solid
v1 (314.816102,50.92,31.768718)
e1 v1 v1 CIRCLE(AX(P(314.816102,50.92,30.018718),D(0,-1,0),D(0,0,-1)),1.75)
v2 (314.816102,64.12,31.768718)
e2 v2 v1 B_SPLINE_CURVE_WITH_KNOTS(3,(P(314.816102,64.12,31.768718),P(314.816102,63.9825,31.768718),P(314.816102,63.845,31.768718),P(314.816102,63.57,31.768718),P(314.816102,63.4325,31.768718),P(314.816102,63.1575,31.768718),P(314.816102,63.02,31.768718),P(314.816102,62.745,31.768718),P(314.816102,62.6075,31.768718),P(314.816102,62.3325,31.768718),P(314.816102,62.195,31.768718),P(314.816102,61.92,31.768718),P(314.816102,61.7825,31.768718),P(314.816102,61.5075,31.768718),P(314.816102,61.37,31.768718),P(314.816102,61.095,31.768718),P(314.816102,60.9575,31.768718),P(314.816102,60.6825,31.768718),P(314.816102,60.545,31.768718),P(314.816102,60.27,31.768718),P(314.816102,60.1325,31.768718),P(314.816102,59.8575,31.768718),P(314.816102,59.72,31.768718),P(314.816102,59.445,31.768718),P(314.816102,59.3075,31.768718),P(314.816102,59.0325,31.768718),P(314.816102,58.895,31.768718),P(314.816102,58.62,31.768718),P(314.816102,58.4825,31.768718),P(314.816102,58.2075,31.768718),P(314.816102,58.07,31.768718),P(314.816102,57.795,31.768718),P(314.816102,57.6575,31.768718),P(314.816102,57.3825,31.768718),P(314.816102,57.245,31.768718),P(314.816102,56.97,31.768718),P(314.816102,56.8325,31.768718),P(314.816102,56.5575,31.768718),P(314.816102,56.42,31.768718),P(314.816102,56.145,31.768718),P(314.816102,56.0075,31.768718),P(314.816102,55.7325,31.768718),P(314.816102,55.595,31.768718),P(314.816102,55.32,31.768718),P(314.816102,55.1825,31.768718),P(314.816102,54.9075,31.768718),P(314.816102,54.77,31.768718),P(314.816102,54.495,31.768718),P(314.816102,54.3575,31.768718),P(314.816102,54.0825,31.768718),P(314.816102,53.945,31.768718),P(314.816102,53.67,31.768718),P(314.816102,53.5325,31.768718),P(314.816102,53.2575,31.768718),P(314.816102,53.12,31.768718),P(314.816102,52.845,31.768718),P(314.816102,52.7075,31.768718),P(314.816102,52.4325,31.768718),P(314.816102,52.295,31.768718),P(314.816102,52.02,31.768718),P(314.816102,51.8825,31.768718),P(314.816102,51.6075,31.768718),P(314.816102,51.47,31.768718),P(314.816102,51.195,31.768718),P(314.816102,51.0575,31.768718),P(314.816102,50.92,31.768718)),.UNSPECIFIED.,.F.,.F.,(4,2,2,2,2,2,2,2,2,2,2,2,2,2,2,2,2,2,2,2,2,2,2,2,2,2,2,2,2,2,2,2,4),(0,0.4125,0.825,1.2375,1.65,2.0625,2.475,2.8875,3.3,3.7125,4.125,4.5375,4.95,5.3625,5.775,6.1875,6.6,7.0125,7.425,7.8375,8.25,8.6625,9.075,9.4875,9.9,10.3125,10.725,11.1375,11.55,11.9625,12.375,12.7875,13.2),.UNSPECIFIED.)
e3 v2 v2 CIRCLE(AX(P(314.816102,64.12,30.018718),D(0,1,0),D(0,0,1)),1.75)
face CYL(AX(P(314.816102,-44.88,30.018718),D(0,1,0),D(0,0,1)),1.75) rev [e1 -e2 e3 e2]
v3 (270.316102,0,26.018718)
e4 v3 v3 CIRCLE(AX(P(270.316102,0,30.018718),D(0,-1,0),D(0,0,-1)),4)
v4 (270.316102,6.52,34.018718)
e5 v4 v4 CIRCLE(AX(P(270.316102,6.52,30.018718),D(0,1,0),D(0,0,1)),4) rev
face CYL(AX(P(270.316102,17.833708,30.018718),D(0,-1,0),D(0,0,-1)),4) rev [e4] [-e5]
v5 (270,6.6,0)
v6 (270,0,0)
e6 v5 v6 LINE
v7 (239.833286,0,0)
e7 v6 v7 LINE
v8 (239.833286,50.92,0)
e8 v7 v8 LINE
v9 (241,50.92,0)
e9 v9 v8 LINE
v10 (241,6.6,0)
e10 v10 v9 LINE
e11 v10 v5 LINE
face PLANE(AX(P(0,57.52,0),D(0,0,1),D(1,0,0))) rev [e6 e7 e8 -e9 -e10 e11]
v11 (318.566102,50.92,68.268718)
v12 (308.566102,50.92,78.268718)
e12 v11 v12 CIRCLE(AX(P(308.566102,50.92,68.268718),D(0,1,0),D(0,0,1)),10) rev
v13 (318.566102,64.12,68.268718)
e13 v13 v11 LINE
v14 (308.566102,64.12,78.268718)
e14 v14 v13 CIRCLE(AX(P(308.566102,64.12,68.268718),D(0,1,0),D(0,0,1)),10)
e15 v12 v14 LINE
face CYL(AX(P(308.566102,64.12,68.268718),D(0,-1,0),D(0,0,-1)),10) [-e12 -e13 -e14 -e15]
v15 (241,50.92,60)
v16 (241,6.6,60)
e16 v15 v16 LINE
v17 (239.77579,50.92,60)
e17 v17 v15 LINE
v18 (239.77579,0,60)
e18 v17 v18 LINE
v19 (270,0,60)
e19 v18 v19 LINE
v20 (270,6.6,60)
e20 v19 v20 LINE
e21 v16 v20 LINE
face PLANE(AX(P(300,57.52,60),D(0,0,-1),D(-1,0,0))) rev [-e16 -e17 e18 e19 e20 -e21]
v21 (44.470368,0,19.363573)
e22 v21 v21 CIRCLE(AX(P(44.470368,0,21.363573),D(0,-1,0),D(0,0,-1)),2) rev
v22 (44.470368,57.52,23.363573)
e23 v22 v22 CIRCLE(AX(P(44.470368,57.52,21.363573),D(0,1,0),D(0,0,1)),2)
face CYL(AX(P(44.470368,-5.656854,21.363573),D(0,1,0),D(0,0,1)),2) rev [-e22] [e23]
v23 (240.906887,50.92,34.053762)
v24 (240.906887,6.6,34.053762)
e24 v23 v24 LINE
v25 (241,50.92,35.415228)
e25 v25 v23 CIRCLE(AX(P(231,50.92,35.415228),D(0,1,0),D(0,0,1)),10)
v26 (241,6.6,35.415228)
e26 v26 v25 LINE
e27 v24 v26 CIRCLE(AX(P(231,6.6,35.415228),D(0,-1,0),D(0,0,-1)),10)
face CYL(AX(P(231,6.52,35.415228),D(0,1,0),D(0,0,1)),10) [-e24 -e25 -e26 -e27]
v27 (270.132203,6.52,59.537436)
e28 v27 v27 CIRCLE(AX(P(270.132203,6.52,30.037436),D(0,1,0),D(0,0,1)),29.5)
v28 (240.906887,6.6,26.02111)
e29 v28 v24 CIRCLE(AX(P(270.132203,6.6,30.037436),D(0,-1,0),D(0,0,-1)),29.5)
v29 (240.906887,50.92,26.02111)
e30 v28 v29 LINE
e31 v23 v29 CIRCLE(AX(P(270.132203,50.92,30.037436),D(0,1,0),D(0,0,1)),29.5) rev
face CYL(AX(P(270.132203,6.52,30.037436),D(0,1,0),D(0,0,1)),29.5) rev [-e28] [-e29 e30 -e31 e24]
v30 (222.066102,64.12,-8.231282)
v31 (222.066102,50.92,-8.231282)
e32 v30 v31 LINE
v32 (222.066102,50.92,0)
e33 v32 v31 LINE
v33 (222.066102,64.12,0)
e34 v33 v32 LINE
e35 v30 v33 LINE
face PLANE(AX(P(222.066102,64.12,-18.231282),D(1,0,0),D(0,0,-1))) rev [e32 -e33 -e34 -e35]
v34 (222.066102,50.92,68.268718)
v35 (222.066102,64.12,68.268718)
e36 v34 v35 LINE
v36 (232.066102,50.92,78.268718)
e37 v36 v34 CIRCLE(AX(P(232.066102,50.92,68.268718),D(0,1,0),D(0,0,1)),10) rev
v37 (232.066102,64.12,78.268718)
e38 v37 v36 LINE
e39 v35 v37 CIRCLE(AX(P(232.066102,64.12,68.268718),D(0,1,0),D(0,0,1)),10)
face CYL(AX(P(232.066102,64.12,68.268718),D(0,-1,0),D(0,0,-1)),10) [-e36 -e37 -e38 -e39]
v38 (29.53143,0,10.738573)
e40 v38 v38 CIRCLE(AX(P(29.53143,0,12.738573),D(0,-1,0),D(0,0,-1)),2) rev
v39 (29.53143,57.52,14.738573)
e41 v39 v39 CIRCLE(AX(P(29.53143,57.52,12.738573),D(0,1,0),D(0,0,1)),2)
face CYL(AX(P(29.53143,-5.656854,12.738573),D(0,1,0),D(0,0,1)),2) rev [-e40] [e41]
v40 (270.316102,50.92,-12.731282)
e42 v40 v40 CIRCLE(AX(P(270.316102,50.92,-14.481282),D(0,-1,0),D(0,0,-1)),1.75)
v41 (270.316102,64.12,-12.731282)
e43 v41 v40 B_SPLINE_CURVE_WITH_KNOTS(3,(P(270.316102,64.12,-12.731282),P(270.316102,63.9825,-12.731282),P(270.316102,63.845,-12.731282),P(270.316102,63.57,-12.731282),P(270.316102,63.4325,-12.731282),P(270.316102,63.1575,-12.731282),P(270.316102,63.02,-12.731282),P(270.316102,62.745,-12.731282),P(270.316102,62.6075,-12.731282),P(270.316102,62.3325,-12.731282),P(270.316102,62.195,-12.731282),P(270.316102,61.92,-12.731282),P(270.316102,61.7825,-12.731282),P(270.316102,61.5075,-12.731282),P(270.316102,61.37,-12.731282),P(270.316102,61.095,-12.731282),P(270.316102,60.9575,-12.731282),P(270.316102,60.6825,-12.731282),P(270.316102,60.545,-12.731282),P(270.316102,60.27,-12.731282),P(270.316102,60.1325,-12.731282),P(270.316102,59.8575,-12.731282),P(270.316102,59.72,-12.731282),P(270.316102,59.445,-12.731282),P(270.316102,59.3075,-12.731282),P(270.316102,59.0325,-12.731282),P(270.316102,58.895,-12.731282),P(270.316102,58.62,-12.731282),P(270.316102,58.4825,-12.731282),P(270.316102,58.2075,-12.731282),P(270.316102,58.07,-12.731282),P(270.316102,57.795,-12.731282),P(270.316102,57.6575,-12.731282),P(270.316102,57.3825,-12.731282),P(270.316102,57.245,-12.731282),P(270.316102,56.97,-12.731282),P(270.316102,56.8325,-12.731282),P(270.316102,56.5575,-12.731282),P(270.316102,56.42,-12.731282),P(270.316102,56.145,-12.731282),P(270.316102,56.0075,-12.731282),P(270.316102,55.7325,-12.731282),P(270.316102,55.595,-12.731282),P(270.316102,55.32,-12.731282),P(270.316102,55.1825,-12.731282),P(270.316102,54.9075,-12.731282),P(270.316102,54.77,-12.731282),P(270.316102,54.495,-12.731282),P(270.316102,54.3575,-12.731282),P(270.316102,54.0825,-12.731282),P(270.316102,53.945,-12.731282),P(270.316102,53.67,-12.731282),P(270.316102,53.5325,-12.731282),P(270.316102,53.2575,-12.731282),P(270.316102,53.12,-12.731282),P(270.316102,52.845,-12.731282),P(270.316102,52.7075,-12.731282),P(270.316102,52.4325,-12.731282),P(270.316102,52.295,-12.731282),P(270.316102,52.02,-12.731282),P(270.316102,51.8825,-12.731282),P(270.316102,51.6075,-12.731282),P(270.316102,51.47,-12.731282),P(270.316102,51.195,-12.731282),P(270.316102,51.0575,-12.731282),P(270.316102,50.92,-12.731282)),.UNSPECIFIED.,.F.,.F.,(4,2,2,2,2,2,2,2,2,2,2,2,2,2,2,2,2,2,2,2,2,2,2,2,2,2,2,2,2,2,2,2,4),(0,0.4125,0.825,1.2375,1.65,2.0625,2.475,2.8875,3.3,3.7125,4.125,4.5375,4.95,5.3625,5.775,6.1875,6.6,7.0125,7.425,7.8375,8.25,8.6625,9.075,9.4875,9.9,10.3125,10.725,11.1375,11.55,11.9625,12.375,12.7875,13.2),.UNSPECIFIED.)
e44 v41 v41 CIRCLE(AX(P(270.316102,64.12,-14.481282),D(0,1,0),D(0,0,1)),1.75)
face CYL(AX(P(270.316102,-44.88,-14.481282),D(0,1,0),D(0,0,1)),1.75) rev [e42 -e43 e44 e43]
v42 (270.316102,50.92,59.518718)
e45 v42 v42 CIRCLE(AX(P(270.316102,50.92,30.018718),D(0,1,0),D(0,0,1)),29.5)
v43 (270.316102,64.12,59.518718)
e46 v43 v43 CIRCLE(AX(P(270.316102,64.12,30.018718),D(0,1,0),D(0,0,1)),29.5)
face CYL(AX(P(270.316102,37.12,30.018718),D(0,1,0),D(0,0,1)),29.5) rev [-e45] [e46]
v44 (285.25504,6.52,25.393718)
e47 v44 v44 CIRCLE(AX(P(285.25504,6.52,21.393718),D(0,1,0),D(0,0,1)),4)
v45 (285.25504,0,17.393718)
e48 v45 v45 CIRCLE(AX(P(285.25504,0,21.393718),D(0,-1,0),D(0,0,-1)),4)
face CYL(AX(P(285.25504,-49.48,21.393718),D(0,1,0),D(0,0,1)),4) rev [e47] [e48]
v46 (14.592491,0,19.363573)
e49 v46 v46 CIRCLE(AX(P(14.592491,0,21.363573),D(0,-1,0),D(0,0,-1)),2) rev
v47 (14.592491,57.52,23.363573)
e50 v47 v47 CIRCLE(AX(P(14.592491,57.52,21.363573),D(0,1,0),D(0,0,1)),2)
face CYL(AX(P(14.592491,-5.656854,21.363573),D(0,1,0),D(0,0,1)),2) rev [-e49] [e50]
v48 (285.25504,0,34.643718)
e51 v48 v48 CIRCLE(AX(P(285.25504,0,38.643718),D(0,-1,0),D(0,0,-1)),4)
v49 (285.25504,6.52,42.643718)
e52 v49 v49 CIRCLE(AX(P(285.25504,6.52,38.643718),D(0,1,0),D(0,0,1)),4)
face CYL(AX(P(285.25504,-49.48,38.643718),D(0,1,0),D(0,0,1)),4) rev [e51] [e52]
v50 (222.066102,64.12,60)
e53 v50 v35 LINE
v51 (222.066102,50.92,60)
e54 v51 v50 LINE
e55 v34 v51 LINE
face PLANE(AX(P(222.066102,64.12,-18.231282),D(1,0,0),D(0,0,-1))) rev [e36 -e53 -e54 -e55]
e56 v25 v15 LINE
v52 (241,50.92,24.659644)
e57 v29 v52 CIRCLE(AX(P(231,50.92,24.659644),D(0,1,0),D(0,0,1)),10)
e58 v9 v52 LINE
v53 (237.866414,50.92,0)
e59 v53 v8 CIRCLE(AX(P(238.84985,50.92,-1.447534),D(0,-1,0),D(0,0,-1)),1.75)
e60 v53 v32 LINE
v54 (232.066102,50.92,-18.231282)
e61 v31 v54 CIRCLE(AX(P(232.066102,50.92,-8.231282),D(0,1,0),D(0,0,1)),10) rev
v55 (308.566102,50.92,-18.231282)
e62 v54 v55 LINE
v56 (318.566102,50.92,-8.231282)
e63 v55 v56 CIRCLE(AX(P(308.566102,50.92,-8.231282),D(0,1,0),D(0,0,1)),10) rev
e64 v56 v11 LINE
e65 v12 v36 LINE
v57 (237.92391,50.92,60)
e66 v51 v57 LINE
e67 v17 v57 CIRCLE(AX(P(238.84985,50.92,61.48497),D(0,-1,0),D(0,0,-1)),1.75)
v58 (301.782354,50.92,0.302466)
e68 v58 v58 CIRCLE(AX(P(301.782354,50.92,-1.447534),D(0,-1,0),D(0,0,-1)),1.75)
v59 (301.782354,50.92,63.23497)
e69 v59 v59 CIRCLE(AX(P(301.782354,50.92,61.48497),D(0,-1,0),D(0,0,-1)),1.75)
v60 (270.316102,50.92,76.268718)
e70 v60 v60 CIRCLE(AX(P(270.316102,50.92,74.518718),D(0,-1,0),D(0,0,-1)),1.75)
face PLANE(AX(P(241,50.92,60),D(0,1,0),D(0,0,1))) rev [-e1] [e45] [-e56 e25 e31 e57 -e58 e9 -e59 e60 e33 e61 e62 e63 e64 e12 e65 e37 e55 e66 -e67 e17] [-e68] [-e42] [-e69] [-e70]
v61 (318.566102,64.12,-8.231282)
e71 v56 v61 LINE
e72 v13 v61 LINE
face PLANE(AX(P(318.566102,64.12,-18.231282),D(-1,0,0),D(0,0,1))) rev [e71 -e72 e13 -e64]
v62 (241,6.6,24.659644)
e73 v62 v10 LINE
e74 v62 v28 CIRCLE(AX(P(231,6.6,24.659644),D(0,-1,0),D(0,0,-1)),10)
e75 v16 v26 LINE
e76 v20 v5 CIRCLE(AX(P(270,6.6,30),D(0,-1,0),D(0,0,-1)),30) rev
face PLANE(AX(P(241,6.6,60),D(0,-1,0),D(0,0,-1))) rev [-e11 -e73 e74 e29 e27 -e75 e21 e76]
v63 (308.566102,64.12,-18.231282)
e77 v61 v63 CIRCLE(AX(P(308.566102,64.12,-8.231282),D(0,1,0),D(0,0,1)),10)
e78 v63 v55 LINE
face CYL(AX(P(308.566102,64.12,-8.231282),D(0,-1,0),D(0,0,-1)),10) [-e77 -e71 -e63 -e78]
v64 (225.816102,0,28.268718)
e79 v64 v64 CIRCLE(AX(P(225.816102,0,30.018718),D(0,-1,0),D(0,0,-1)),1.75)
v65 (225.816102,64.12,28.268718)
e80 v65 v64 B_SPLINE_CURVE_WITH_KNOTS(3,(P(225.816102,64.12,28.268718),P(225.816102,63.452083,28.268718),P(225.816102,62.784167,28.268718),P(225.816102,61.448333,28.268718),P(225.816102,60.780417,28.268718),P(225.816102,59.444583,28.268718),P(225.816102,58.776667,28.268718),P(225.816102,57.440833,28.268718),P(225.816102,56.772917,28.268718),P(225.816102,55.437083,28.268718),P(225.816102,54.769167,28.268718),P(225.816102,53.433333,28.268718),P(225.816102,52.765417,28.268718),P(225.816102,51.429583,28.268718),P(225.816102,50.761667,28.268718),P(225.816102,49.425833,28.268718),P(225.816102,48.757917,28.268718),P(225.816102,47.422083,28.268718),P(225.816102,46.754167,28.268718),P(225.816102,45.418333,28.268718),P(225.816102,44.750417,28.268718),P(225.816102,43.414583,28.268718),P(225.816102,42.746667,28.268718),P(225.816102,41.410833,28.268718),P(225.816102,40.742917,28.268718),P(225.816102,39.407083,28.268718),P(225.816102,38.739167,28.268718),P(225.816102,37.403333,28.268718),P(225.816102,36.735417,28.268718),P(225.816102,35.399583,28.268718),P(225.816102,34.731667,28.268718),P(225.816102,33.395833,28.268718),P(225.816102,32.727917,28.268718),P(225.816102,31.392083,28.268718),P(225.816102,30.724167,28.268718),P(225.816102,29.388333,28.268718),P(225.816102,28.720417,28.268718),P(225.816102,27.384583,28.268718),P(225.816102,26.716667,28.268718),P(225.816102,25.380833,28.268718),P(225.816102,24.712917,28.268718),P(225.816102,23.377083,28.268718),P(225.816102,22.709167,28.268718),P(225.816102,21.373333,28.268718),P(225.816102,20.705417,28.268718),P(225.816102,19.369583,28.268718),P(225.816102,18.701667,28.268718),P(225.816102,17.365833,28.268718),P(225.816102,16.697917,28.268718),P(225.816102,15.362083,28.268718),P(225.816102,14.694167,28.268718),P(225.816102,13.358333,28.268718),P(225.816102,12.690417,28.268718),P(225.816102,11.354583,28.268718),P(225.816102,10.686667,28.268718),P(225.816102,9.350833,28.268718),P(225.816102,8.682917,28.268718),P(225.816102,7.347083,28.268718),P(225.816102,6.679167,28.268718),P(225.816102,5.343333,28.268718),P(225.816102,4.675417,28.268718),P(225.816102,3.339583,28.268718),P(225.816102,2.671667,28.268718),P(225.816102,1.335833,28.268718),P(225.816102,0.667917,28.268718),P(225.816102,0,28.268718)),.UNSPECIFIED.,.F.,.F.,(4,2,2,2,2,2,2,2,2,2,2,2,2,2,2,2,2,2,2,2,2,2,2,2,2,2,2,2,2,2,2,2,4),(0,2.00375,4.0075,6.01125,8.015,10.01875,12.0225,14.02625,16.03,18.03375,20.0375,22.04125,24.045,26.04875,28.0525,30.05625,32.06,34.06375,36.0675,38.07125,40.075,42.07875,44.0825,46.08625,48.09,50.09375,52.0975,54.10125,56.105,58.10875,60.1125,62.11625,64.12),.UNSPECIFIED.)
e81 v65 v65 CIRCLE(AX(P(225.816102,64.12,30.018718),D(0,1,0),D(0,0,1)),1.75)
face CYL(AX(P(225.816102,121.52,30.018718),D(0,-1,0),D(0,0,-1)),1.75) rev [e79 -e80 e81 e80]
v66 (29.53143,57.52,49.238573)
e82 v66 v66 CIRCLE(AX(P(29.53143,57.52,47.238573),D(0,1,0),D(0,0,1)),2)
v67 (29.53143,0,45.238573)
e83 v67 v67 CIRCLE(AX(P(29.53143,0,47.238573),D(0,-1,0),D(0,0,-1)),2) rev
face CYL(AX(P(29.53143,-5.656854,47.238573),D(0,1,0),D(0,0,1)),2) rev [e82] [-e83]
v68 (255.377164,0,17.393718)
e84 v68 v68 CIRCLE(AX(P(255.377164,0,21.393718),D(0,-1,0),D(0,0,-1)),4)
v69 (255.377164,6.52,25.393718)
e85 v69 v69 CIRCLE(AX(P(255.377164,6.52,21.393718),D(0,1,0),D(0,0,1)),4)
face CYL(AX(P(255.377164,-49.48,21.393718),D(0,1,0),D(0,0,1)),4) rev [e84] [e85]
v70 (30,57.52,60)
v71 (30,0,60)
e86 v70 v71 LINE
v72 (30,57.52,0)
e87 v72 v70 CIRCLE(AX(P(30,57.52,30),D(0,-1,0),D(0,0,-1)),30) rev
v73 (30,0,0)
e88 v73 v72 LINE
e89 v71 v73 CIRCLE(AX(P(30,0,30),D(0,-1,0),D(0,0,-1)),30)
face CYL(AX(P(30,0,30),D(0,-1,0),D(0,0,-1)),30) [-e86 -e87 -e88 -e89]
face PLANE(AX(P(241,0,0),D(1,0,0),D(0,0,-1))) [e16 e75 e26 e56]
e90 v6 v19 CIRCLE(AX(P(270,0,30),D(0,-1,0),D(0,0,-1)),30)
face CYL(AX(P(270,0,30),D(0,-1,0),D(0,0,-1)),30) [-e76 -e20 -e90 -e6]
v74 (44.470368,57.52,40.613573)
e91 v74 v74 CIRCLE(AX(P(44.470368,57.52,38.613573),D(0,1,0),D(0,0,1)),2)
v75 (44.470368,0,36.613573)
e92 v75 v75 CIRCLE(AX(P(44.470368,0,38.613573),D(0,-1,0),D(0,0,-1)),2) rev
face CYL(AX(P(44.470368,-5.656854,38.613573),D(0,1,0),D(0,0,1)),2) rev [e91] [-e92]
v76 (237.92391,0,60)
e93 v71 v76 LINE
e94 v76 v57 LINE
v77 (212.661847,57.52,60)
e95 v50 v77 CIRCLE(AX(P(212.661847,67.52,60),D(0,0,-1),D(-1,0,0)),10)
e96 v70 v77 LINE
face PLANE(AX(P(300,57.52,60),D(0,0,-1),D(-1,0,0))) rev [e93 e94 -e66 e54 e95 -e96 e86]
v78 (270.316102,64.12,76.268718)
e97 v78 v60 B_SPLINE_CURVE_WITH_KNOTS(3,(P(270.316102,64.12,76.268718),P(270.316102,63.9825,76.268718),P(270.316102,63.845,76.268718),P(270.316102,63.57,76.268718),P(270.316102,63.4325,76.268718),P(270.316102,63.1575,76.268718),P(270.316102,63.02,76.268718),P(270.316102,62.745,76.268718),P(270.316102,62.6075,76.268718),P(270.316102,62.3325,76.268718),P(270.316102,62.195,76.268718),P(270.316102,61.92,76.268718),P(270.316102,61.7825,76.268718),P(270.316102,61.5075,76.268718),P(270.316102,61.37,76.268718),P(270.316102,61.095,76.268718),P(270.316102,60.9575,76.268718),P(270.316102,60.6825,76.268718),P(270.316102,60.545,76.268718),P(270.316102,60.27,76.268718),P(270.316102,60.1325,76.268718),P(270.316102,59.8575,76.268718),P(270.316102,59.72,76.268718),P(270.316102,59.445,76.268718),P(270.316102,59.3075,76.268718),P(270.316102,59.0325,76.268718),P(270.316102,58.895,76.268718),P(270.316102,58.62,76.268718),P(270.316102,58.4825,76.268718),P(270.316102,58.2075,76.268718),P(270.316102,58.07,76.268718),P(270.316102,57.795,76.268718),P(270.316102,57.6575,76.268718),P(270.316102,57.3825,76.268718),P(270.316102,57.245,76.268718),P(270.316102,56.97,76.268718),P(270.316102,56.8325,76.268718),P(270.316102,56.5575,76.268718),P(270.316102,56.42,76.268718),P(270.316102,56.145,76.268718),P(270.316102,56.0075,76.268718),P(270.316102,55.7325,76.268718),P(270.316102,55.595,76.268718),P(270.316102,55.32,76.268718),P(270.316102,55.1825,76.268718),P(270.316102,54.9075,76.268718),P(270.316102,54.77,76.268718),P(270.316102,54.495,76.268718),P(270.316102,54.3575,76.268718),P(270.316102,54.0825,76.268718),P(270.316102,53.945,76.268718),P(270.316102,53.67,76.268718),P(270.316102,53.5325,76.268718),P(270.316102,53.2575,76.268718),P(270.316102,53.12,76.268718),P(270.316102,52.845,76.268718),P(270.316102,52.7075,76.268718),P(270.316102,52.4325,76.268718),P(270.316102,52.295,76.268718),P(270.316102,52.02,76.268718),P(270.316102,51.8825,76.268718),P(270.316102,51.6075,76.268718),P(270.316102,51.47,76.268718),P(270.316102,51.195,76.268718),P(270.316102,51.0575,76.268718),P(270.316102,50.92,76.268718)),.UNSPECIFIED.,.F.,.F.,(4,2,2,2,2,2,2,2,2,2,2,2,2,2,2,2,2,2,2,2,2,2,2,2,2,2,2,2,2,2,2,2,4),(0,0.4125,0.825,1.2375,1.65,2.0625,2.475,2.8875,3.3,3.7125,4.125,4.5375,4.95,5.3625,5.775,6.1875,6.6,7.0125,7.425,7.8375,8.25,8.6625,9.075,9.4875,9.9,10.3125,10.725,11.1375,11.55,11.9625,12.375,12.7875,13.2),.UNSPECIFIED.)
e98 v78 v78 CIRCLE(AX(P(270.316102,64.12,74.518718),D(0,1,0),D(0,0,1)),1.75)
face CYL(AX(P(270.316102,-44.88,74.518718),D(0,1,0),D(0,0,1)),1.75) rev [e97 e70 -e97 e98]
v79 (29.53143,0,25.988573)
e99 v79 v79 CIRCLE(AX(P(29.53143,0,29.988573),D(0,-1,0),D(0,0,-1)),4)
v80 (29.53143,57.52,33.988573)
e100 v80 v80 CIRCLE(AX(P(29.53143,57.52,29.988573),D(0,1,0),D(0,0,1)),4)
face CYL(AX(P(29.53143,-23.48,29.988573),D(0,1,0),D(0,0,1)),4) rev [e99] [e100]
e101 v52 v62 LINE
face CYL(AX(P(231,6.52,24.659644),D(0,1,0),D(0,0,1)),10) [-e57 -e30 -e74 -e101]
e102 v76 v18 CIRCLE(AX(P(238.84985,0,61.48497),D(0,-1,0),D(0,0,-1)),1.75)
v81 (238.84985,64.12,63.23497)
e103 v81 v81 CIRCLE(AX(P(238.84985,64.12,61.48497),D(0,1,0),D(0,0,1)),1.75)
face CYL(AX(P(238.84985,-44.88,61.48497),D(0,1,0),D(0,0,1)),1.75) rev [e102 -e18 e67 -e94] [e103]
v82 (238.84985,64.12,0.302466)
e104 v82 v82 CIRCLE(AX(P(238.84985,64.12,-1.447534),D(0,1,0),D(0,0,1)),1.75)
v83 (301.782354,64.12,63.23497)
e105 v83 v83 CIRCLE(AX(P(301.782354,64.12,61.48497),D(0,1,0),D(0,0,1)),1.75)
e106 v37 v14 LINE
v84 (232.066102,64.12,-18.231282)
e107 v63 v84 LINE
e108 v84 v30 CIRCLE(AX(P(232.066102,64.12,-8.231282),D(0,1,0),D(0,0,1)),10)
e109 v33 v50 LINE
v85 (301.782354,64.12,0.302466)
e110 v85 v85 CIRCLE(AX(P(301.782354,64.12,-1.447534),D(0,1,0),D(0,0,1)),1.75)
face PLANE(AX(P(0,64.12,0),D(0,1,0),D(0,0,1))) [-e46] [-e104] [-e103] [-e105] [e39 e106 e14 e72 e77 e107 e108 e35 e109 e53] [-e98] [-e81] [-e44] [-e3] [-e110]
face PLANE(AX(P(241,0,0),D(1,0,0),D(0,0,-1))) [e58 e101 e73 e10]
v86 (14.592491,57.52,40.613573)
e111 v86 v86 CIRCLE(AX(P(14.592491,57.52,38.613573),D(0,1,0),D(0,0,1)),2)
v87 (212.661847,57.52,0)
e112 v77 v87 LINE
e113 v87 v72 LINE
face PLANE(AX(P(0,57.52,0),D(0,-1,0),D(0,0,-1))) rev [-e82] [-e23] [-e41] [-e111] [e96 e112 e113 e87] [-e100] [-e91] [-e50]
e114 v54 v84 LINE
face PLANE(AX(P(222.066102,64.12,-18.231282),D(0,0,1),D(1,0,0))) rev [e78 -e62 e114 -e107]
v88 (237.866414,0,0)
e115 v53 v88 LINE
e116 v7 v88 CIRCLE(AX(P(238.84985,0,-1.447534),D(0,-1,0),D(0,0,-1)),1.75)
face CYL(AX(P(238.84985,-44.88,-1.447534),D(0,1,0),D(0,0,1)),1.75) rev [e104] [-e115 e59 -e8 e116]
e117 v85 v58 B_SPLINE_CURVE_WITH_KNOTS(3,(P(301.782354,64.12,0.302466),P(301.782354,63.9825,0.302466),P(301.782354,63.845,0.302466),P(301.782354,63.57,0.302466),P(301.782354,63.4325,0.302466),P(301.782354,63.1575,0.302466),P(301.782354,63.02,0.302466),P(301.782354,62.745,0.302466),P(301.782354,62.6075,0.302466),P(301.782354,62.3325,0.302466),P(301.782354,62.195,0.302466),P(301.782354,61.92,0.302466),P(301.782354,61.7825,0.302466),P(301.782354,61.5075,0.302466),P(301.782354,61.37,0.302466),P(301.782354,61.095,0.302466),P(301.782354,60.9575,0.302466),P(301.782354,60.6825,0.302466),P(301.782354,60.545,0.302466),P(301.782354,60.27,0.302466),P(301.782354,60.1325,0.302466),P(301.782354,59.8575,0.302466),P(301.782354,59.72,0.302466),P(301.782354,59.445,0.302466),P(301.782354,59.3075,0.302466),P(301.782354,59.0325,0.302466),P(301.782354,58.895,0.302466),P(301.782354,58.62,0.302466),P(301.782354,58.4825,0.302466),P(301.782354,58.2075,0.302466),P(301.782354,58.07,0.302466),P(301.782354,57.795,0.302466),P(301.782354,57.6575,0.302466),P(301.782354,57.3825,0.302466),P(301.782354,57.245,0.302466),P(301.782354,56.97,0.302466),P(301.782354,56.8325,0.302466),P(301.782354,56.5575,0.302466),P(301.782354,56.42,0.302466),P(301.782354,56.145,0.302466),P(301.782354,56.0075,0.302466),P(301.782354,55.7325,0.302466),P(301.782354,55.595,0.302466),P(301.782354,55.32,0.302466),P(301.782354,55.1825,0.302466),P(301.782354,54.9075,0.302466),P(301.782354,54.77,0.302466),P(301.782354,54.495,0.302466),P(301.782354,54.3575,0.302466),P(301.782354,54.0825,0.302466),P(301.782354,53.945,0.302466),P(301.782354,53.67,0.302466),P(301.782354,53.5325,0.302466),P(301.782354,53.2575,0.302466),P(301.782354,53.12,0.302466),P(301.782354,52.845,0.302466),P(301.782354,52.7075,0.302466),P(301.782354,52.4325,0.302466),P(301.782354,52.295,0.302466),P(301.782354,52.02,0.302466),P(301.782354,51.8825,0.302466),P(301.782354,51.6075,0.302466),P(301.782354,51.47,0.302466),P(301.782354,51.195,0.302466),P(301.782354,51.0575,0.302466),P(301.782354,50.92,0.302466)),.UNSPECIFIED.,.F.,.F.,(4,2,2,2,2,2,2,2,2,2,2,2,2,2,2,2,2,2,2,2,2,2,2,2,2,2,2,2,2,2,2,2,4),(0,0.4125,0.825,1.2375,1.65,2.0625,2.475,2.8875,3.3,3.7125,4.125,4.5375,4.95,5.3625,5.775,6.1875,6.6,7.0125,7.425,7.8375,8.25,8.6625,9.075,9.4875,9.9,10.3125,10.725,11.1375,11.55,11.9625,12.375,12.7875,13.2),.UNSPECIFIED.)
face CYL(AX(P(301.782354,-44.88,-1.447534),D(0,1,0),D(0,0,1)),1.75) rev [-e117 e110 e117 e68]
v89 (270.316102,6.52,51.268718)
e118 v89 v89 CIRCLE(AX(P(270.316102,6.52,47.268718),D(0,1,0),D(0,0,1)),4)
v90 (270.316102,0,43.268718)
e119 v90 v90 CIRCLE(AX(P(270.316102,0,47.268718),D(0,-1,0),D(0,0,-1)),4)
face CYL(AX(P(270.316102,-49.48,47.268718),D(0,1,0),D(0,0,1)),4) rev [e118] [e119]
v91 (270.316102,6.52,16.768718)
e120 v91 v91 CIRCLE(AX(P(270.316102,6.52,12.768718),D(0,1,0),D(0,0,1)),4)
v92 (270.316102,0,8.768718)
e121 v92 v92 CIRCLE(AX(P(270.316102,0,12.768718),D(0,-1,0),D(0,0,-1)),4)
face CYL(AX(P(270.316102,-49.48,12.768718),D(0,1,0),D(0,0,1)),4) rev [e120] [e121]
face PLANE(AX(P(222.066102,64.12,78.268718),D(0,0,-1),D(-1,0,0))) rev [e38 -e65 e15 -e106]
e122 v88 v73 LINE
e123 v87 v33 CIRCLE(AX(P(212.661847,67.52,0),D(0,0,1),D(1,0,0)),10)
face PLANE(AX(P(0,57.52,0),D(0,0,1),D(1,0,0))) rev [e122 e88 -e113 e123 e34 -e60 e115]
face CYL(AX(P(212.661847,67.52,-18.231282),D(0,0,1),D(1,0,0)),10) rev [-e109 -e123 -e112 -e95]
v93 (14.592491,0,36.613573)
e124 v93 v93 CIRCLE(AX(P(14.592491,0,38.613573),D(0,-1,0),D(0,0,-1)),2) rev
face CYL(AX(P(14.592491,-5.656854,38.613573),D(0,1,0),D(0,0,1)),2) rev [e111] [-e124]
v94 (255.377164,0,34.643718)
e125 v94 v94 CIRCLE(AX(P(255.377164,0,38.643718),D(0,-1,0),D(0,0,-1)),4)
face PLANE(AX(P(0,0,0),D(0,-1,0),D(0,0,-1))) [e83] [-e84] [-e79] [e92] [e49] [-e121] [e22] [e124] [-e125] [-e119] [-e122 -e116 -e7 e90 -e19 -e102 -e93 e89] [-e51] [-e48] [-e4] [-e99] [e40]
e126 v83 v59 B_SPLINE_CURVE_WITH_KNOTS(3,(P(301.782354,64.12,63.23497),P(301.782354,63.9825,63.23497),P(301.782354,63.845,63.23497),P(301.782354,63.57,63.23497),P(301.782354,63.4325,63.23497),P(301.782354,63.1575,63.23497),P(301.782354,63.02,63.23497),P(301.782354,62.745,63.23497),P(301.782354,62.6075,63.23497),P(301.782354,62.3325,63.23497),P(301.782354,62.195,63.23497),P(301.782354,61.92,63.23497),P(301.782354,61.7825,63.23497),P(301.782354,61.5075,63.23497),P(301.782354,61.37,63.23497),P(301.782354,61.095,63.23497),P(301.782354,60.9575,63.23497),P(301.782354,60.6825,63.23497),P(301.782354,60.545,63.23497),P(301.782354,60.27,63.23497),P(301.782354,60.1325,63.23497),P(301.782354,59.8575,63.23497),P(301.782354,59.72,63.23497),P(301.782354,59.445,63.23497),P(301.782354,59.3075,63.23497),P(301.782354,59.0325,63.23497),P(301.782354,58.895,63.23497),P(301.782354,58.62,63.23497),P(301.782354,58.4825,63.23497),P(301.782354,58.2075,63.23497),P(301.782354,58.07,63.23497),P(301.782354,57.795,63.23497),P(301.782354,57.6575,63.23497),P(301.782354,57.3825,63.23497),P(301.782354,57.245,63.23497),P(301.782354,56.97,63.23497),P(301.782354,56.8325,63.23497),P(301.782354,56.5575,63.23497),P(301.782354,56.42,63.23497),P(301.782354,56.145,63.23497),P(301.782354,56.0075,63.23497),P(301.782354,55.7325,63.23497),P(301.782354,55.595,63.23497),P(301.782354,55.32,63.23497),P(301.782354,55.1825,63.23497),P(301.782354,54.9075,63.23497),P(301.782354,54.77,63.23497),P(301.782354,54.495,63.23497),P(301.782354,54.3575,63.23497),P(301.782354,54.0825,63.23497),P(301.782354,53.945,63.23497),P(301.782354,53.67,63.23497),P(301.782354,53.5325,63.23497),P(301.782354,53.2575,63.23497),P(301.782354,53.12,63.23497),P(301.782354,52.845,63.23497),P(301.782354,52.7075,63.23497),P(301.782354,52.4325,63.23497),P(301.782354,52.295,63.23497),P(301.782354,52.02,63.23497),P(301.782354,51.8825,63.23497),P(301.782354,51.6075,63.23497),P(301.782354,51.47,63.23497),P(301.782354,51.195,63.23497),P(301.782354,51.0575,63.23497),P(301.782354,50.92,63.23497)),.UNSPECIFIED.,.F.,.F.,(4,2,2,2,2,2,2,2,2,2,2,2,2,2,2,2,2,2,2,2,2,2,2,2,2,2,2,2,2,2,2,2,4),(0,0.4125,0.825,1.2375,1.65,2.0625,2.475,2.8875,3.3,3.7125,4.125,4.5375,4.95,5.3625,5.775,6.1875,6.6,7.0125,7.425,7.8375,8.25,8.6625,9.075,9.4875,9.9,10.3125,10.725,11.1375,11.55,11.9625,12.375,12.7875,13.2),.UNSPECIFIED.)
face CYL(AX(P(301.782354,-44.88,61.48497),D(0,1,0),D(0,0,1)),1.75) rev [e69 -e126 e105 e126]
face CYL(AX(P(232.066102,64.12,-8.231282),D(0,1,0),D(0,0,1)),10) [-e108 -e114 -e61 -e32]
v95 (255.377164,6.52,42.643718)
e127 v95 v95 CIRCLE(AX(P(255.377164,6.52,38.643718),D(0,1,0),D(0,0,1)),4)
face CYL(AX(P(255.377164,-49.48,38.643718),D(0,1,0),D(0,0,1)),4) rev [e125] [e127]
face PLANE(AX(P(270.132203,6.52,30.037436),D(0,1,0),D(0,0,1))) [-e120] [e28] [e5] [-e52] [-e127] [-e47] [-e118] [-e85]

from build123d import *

# Parameters (mm, degrees)
SKETCH_1_W           = 300
SKETCH_1_H           = 60
EXTRUDE_1_DEPTH      = 57.52
FILLET_1_RADIUS      = 30
FILLET_1_LENGTH      = 57.52
SKETCH_9_W           = 60
SKETCH_9_H           = 44.32
CUT_EXTRUDE_5_DEPTH  = 59
FILLET_2_RADIUS      = 30
FILLET_2_LENGTH      = 6.6
FILLET_3_RADIUS      = 30
FILLET_3_LENGTH      = 6.6
SKETCH_10_R          = 29.5
CUT_EXTRUDE_6_DEPTH  = 51
FILLET_4_R           = 10
SKETCH_16_R          = 1.75
CUT_EXTRUDE_8_DEPTH  = 115
SKETCH_17_W          = 96.5
SKETCH_17_H          = 96.5
EXTRUDE_3_DEPTH      = 6.6
SKETCH_18_R          = 4
CUT_EXTRUDE_9_DEPTH  = 113.6
CUT_EXTRUDE_START    = -109
SKETCH_20_R          = 1.75
CUT_EXTRUDE_10_DEPTH = 109
SKETCH_21_R          = 29.5
CUT_EXTRUDE_11_DEPTH = 27
EXTRUDE_START        = -10
SKETCH_24_W          = 96.5
SKETCH_24_H          = 96.5
SKETCH_24_R          = 29.5
EXTRUDE_5_DEPTH      = 10
SKETCH_25_R          = 1.75
CUT_EXTRUDE_12_DEPTH = 28
SKETCH_26_R          = 4
CUT_EXTRUDE_13_DEPTH = 81
SKETCH_27_R          = 2
CUT_EXTRUDE_14_DEPTH = 57.52
SKETCH_28_R          = 4
CUT_EXTRUDE_15_DEPTH = 6.52
FILLET_5_R           = 10
FILLET_6_R           = 10
FILLET_7_R           = 10
FILLET_8_R           = 10
FILLET_10_R          = 10


with BuildPart() as part:
    # 草图1 → 凸台-拉伸1 (new body)
    with BuildSketch(Plane(origin=(0, 0, 0), x_dir=(1, 0, 0), z_dir=(0, 1, 0))):
        with Locations((150, -30)):
            Rectangle(SKETCH_1_W, SKETCH_1_H)
    extrude(amount=EXTRUDE_1_DEPTH)

    # 圆角1: full round fillet: the end face becomes a half cylinder, R = half its width
    fillet_1_face = Plane((0, 28.76, 30), x_dir=(0, -1, 0), z_dir=(-1, 0, 0))  # on the end face: x along it, z out of the body
    fillet_1_slab = fillet_1_face.offset(-FILLET_1_RADIUS / 2) * Box(FILLET_1_LENGTH, 2 * FILLET_1_RADIUS, FILLET_1_RADIUS, mode=Mode.PRIVATE)  # the body's end, R deep
    fillet_1_round = Plane((30, 28.76, 30), x_dir=(-1, 0, 0), z_dir=(0, -1, 0)) * Cylinder(FILLET_1_RADIUS, FILLET_1_LENGTH, mode=Mode.PRIVATE)  # its axis R under the face
    add(fillet_1_slab - fillet_1_round, mode=Mode.SUBTRACT)

    # 草图9 → 切除-拉伸5 (cut)
    with BuildSketch(Plane(origin=(300, 0, 0), x_dir=(0, 0, -1), z_dir=(1, 0, 0))):
        with Locations((-30, 28.76)):
            Rectangle(SKETCH_9_W, SKETCH_9_H)
    extrude(amount=-CUT_EXTRUDE_5_DEPTH, mode=Mode.SUBTRACT)

    # 圆角2: full round fillet: the end face becomes a half cylinder, R = half its width
    fillet_2_face = Plane((300, 54.22, 30), x_dir=(0, 1, 0), z_dir=(1, 0, 0))  # on the end face: x along it, z out of the body
    fillet_2_slab = fillet_2_face.offset(-FILLET_2_RADIUS / 2) * Box(FILLET_2_LENGTH, 2 * FILLET_2_RADIUS, FILLET_2_RADIUS, mode=Mode.PRIVATE)  # the body's end, R deep
    fillet_2_round = Plane((270, 54.22, 30), x_dir=(1, 0, 0), z_dir=(0, 1, 0)) * Cylinder(FILLET_2_RADIUS, FILLET_2_LENGTH, mode=Mode.PRIVATE)  # its axis R under the face
    add(fillet_2_slab - fillet_2_round, mode=Mode.SUBTRACT)

    # 圆角3: full round fillet: the end face becomes a half cylinder, R = half its width
    fillet_3_face = Plane((300, 3.3, 30), x_dir=(0, 1, 0), z_dir=(1, 0, 0))  # on the end face: x along it, z out of the body
    fillet_3_slab = fillet_3_face.offset(-FILLET_3_RADIUS / 2) * Box(FILLET_3_LENGTH, 2 * FILLET_3_RADIUS, FILLET_3_RADIUS, mode=Mode.PRIVATE)  # the body's end, R deep
    fillet_3_round = Plane((270, 3.3, 30), x_dir=(1, 0, 0), z_dir=(0, 1, 0)) * Cylinder(FILLET_3_RADIUS, FILLET_3_LENGTH, mode=Mode.PRIVATE)  # its axis R under the face
    add(fillet_3_slab - fillet_3_round, mode=Mode.SUBTRACT)

    # 草图10 → 切除-拉伸6 (cut)
    with BuildSketch(Plane(origin=(0, 57.52, 0), x_dir=(1, 0, 0), z_dir=(0, 1, 0))):
        with Locations(Location((270.132203493, -30.03743589, 0), (0, 0, 270))):
            Circle(SKETCH_10_R)
    extrude(amount=-CUT_EXTRUDE_6_DEPTH, mode=Mode.SUBTRACT)

    # 圆角4
    fillet_4_edges = [part.edges().sort_by_distance(p)[0] for p in [
        (241, 28.76, 34.681218791),
        (241, 28.76, 25.39365299),
    ]]
    fillet(fillet_4_edges, radius=FILLET_4_R)

    # 草图16 → 切除-拉伸8 (cut)
    with BuildSketch(Plane(origin=(0, 6.52, 0), x_dir=(1, 0, 0), z_dir=(0, 1, 0))):
        with Locations(Location((225.816101747, -30.018717945, 0), (0, 0, 90))):
            Circle(SKETCH_16_R)
    extrude(amount=CUT_EXTRUDE_8_DEPTH, mode=Mode.SUBTRACT)

    # 草图17 → 凸台-拉伸3 (add)
    with BuildSketch(Plane(origin=(0, 57.52, 0), x_dir=(1, 0, 0), z_dir=(0, 1, 0))):
        with Locations((270.316101747, -30.018717945)):
            Rectangle(SKETCH_17_W, SKETCH_17_H)
    extrude(amount=EXTRUDE_3_DEPTH)

    # 草图18 → 切除-拉伸9 (cut)
    with BuildSketch(Plane(origin=(0, 64.12, 0), x_dir=(1, 0, 0), z_dir=(0, 1, 0))):
        with Locations(Location((270.316101747, -12.768717945, 0), (0, 0, 270))):
            Circle(SKETCH_18_R)
        with Locations(Location((285.255039962, -21.393717945, 0), (0, 0, 270))):
            Circle(SKETCH_18_R)
        with Locations(Location((285.255039962, -38.643717945, 0), (0, 0, 270))):
            Circle(SKETCH_18_R)
        with Locations(Location((270.316101747, -47.268717945, 0), (0, 0, 270))):
            Circle(SKETCH_18_R)
        with Locations(Location((255.377163531, -38.643717945, 0), (0, 0, 270))):
            Circle(SKETCH_18_R)
        with Locations(Location((255.377163531, -21.393717945, 0), (0, 0, 270))):
            Circle(SKETCH_18_R)
    extrude(amount=-CUT_EXTRUDE_9_DEPTH, mode=Mode.SUBTRACT)

    # 草图20 → 切除-拉伸10 (cut)
    with BuildSketch(Plane(origin=(0, 64.12, 0), x_dir=(1, 0, 0), z_dir=(0, 1, 0)).offset(CUT_EXTRUDE_START)):
        with Locations(Location((270.316101747, 14.481282055, 0), (0, 0, 270))):
            Circle(SKETCH_20_R)
        with Locations(Location((301.782353509, 1.447533818, 0), (0, 0, 270))):
            Circle(SKETCH_20_R)
        with Locations(Location((314.816101747, -30.018717945, 0), (0, 0, 270))):
            Circle(SKETCH_20_R)
        with Locations(Location((301.782353509, -61.484969708, 0), (0, 0, 270))):
            Circle(SKETCH_20_R)
        with Locations(Location((270.316101747, -74.518717945, 0), (0, 0, 270))):
            Circle(SKETCH_20_R)
        with Locations(Location((238.849849984, -61.484969708, 0), (0, 0, 270))):
            Circle(SKETCH_20_R)
        with Locations(Location((225.816101747, -30.018717945, 0), (0, 0, 90))):
            Circle(SKETCH_20_R)
        with Locations(Location((238.849849984, 1.447533818, 0), (0, 0, 270))):
            Circle(SKETCH_20_R)
    extrude(amount=CUT_EXTRUDE_10_DEPTH, mode=Mode.SUBTRACT)

    # 草图21 → 切除-拉伸11 (cut)
    with BuildSketch(Plane(origin=(0, 64.12, 0), x_dir=(1, 0, 0), z_dir=(0, 1, 0))):
        with Locations(Location((270.316101747, -30.018717945, 0), (0, 0, 270))):
            Circle(SKETCH_21_R)
    extrude(amount=-CUT_EXTRUDE_11_DEPTH, mode=Mode.SUBTRACT)

    # 草图24 → 凸台-拉伸5 (add)
    with BuildSketch(Plane(origin=(0, 50.92, 0), x_dir=(-1, 0, 0), z_dir=(0, -1, 0)).offset(EXTRUDE_START)):
        with Locations((-270.316101747, -30.018717945)):
            Rectangle(SKETCH_24_W, SKETCH_24_H)
        with Locations(Location((-270.316101747, -30.018717945, 0), (0, 0, 270))):
            Circle(SKETCH_24_R, mode=Mode.SUBTRACT)
    extrude(amount=EXTRUDE_5_DEPTH)

    # 草图25 → 切除-拉伸12 (cut)
    with BuildSketch(Plane(origin=(0, 50.92, 0), x_dir=(-1, 0, 0), z_dir=(0, -1, 0))):
        with Locations(Location((-314.816101747, -30.018717945, 0), (0, 0, 270))):
            Circle(SKETCH_25_R)
        with Locations(Location((-301.782353509, 1.447533818, 0), (0, 0, 270))):
            Circle(SKETCH_25_R)
        with Locations(Location((-270.316101747, 14.481282055, 0), (0, 0, 270))):
            Circle(SKETCH_25_R)
        with Locations(Location((-238.849849984, 1.447533818, 0), (0, 0, 270))):
            Circle(SKETCH_25_R)
        with Locations(Location((-225.816101747, -30.018717945, 0), (0, 0, 90))):
            Circle(SKETCH_25_R)
        with Locations(Location((-238.849849984, -61.484969708, 0), (0, 0, 270))):
            Circle(SKETCH_25_R)
        with Locations(Location((-270.316101747, -74.518717945, 0), (0, 0, 270))):
            Circle(SKETCH_25_R)
        with Locations(Location((-301.782353509, -61.484969708, 0), (0, 0, 270))):
            Circle(SKETCH_25_R)
    extrude(amount=-CUT_EXTRUDE_12_DEPTH, mode=Mode.SUBTRACT)

    # 草图26 → 切除-拉伸13 (cut)
    with BuildSketch(Plane(origin=(0, 57.52, 0), x_dir=(1, 0, 0), z_dir=(0, 1, 0))):
        with Locations(Location((29.531429568, -29.988572589, 0), (0, 0, 270))):
            Circle(SKETCH_26_R)
    extrude(amount=-CUT_EXTRUDE_13_DEPTH, mode=Mode.SUBTRACT)

    # 草图27 → 切除-拉伸14 (cut)
    with BuildSketch(Plane(origin=(0, 57.52, 0), x_dir=(1, 0, 0), z_dir=(0, 1, 0))):
        with Locations(Location((29.531429568, -12.738572589, 0), (0, 0, 270))):
            Circle(SKETCH_27_R)
        with Locations(Location((44.470367783, -21.363572589, 0), (0, 0, 270))):
            Circle(SKETCH_27_R)
        with Locations(Location((44.470367783, -38.613572589, 0), (0, 0, 270))):
            Circle(SKETCH_27_R)
        with Locations(Location((29.531429568, -47.238572589, 0), (0, 0, 270))):
            Circle(SKETCH_27_R)
        with Locations(Location((14.592491352, -38.613572589, 0), (0, 0, 270))):
            Circle(SKETCH_27_R)
        with Locations(Location((14.592491352, -21.363572589, 0), (0, 0, 270))):
            Circle(SKETCH_27_R)
    extrude(amount=-CUT_EXTRUDE_14_DEPTH, mode=Mode.SUBTRACT)

    # 草图28 → 切除-拉伸15 (cut)
    with BuildSketch(Plane(origin=(0, 0, 0), x_dir=(-1, 0, 0), z_dir=(0, -1, 0))):
        with Locations(Location((-270.316101747, -30.018717945, 0), (0, 0, 90))):
            Circle(SKETCH_28_R)
    extrude(amount=-CUT_EXTRUDE_15_DEPTH, mode=Mode.SUBTRACT)

    # 圆角5
    fillet_5_edges = [part.edges().sort_by_distance(p)[0] for p in [
        (222.066101747, 57.52, -18.231282055),
    ]]
    fillet(fillet_5_edges, radius=FILLET_5_R)

    # 圆角6
    fillet_6_edges = [part.edges().sort_by_distance(p)[0] for p in [
        (318.566101747, 57.52, -18.231282055),
    ]]
    fillet(fillet_6_edges, radius=FILLET_6_R)

    # 圆角7
    fillet_7_edges = [part.edges().sort_by_distance(p)[0] for p in [
        (318.566101747, 57.52, 78.268717945),
    ]]
    fillet(fillet_7_edges, radius=FILLET_7_R)

    # 圆角8
    fillet_8_edges = [part.edges().sort_by_distance(p)[0] for p in [
        (222.066101747, 57.52, 78.268717945),
    ]]
    fillet(fillet_8_edges, radius=FILLET_8_R)

    # 圆角10
    # the kernel refuses this fillet: 10 mm, written as the material it adds along each edge
    with BuildSketch(Plane(origin=(222.066101747, 57.52, 60), x_dir=(0, 1, 0), z_dir=(0, 0, -1))) as fillet_10_piece_1:
        with BuildLine():
            CenterArc((10, -9.404254356), FILLET_10_R, 109.87687407, 70.12312593)
            Line((0, -9.404254356), (-0.2, -9.404254356))
            Line((-0.2, -9.404254356), (-0.2, 0))
            Line((-0.2, 0), (0, 0.2))
            ThreePointArc((0, 0.2), (3.3, 0.2), (6.532, 0.188085087))
            Line((6.532, 0.188085087), (6.6, 0))
        make_face()
    extrude(amount=60)


solid = part.part
